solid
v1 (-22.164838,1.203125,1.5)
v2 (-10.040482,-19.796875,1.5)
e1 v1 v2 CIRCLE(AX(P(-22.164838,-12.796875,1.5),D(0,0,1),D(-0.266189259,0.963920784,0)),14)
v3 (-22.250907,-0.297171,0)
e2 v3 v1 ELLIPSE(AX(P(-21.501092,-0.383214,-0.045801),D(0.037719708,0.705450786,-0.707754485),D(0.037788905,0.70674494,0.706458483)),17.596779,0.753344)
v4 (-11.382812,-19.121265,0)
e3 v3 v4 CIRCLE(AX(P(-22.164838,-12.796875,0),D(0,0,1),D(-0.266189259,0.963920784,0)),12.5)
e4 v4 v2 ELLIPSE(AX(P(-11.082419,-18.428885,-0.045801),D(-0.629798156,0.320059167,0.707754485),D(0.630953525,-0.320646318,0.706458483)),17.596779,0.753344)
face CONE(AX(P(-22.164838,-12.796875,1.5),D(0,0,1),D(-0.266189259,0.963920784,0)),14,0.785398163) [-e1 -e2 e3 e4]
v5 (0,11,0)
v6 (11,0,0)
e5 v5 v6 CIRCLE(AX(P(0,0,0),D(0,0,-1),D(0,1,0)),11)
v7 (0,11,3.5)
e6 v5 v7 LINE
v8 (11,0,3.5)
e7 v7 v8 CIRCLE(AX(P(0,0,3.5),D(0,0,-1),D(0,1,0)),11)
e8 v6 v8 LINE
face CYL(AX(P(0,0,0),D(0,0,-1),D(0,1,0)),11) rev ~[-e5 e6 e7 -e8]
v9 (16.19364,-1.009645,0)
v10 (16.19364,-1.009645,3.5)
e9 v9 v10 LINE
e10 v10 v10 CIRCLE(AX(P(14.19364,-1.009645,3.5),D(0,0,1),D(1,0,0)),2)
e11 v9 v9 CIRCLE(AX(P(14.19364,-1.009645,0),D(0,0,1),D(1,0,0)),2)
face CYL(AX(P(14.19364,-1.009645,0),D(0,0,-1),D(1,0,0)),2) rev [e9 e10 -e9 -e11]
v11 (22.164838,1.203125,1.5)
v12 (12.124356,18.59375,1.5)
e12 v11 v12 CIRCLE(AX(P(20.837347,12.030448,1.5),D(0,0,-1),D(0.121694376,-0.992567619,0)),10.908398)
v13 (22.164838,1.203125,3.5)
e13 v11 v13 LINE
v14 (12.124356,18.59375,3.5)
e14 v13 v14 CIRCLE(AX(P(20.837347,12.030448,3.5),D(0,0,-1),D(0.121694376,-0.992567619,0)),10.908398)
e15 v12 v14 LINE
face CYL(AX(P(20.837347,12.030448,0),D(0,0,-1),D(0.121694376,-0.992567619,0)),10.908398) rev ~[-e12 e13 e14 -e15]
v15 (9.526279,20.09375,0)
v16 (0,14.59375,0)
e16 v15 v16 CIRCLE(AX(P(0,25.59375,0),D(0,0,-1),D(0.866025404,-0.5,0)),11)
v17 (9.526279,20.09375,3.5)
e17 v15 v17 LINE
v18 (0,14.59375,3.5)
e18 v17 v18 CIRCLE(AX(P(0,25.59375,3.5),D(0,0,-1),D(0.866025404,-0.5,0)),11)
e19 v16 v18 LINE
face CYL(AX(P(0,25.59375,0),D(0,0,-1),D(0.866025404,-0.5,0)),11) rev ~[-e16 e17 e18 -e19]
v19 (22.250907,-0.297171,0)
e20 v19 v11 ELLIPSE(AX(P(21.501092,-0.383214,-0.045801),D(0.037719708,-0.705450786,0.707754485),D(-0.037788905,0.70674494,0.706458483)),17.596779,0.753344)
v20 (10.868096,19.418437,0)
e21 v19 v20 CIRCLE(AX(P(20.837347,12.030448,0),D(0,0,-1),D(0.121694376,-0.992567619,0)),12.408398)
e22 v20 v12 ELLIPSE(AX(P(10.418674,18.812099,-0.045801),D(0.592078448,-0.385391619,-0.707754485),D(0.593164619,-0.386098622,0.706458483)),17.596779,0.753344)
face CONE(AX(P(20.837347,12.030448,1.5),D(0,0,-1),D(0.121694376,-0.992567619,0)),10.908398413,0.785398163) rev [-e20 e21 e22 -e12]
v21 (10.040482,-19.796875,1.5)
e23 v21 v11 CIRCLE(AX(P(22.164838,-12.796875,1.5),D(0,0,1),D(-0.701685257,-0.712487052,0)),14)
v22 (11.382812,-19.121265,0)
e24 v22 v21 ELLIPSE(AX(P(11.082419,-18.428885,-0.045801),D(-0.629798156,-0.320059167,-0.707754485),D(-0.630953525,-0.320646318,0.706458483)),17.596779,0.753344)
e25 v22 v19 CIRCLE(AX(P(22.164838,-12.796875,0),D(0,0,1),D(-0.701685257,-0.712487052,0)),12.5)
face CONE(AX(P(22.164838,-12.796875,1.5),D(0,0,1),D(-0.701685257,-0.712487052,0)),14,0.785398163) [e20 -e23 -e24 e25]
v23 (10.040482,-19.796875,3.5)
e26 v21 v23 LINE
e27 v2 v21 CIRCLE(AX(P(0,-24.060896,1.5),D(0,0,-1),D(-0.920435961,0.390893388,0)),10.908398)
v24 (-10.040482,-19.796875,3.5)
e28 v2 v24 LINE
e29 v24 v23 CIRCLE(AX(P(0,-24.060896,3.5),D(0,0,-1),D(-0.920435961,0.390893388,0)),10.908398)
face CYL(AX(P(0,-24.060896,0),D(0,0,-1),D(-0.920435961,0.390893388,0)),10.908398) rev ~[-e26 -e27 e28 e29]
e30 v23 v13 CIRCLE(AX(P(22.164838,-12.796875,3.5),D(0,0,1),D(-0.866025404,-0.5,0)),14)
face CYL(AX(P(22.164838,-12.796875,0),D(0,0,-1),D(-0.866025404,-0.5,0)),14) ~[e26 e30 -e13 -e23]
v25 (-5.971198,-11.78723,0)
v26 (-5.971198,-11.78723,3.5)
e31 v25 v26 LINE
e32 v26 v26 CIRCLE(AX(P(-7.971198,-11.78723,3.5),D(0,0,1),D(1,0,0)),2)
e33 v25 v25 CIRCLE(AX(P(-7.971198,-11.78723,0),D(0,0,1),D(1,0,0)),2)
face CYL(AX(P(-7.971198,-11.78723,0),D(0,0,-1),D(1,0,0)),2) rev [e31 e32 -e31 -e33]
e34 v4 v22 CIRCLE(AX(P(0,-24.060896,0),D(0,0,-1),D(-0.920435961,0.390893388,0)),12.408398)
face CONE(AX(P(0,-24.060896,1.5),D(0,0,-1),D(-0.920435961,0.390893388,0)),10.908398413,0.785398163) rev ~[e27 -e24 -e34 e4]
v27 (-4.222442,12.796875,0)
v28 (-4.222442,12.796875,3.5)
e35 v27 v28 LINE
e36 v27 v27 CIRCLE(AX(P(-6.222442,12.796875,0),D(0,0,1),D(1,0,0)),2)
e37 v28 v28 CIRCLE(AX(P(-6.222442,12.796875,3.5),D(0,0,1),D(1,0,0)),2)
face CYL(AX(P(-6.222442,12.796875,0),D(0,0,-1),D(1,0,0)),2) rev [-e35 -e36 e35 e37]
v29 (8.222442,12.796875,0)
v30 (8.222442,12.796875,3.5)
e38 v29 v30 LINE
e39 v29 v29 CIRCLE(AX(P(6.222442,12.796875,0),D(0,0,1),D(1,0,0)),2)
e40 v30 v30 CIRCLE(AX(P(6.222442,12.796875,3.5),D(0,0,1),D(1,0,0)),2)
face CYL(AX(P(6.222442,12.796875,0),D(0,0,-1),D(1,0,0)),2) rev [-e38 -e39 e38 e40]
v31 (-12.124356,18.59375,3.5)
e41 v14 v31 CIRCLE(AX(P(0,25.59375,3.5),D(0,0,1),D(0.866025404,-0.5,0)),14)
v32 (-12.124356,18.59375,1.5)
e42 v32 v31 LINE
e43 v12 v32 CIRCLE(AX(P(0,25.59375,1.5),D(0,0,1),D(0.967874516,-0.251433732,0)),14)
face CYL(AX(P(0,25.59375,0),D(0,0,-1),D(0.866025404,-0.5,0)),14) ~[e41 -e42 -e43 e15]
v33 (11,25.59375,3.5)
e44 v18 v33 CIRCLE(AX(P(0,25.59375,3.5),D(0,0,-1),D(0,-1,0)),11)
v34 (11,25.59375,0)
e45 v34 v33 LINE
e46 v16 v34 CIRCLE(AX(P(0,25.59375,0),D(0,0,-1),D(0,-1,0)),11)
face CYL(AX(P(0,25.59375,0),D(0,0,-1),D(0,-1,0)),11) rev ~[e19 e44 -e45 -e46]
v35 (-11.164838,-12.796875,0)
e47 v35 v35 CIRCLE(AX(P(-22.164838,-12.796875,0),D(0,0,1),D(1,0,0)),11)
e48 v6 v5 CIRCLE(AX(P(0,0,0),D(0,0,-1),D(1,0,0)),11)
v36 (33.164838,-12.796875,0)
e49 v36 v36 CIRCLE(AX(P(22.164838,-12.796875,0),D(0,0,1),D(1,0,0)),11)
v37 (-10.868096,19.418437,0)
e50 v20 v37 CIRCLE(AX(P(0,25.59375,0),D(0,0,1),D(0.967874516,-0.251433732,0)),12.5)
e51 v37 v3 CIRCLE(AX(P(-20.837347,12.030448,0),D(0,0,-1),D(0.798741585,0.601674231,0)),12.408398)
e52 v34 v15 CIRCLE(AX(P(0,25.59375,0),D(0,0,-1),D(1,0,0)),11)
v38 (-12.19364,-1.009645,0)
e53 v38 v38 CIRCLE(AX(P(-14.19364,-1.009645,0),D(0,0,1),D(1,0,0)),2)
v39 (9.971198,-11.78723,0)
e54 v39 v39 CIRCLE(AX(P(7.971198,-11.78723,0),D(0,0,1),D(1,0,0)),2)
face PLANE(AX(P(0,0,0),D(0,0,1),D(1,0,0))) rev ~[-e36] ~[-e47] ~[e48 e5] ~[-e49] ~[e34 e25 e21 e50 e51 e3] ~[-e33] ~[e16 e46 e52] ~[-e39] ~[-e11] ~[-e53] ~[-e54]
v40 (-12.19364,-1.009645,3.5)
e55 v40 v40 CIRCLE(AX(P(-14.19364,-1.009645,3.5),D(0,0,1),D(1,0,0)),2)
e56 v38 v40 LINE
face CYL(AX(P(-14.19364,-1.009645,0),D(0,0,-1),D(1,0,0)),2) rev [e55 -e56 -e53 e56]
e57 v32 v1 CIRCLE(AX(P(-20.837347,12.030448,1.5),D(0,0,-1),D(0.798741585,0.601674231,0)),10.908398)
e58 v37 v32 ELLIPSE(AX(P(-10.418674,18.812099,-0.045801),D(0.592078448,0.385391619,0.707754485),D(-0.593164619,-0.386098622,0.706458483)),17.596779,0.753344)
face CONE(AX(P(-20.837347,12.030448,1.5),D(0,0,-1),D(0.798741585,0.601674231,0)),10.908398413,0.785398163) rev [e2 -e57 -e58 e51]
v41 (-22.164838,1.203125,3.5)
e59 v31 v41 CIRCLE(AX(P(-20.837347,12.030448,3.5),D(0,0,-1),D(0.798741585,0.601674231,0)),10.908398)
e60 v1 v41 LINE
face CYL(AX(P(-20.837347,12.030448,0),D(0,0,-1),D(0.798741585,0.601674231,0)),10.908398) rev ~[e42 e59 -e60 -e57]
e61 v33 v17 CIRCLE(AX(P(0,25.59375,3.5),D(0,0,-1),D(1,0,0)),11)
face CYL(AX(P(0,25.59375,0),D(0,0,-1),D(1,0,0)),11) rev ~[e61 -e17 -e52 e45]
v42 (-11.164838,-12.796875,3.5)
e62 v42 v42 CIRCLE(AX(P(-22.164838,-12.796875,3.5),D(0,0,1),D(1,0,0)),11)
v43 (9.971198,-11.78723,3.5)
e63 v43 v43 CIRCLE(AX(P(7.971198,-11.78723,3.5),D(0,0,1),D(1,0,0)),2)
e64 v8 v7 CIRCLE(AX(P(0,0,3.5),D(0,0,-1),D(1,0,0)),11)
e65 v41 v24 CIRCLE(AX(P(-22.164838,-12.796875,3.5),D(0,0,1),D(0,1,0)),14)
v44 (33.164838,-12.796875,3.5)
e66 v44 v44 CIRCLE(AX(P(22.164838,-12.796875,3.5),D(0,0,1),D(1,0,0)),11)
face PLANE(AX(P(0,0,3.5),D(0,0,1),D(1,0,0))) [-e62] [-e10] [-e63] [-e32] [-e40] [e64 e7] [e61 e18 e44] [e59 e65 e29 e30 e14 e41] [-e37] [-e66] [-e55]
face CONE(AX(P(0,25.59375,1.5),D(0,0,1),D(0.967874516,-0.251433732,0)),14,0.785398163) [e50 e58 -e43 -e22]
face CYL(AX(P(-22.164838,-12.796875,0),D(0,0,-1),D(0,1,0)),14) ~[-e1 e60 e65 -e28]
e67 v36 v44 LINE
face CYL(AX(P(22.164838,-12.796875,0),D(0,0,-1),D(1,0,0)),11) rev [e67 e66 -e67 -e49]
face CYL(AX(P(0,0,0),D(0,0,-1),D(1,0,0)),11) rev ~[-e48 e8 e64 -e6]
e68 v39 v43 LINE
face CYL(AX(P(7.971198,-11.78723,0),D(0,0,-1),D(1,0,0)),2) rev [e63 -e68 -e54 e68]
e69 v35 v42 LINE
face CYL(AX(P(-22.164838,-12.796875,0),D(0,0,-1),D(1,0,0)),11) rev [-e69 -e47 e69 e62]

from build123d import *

# Parameters (mm, degrees)
F0_R       = 11
F0_R_2     = 2
F1_DEPTH   = 3.5
F2_C1_SIZE = 1.5
F2_C2_SIZE = 1.5
F2_C3_SIZE = 1.5
F2_C4_SIZE = 1.5
F2_C5_SIZE = 1.5
F2_C6_SIZE = 1.5


with BuildPart() as f1:
    # F0 (on Top) → F1 (new body)
    with BuildSketch(Plane.XY):
        with BuildLine():
            ThreePointArc((22.164837833, 1.2031249106), (11.390396953, 6.576248747), (12.124355653, 18.5937501788))
            ThreePointArc((12.124355653, 18.5937501788), (0, 39.5937501788), (-12.124355653, 18.5937501788))
            ThreePointArc((-12.124355653, 18.5937501788), (-11.390396953, 6.576248747), (-22.164837833, 1.2031249106))
            ThreePointArc((-22.164837833, 1.2031249106), (-34.2891934859, -19.7968750894), (-10.04048218, -19.7968750894))
            ThreePointArc((-10.04048218, -19.7968750894), (0, -13.152497494), (10.04048218, -19.7968750894))
            ThreePointArc((10.04048218, -19.7968750894), (34.2891934859, -19.7968750894), (22.164837833, 1.2031249106))
        make_face()
        with Locations((-22.164837833, -12.7968750894)):
            Circle(F0_R, mode=Mode.SUBTRACT)
        with Locations((-7.9711980778, -11.7872301109)):
            Circle(F0_R_2, mode=Mode.SUBTRACT)
        with Locations((-14.1936397552, -1.0096449785)):
            Circle(F0_R_2, mode=Mode.SUBTRACT)
        with Locations((7.9711980778, -11.7872301109)):
            Circle(F0_R_2, mode=Mode.SUBTRACT)
        with Locations((22.164837833, -12.7968750894)):
            Circle(F0_R, mode=Mode.SUBTRACT)
        with BuildLine():
            ThreePointArc((0, 11), (7.7781745931, 7.7781745931), (11, 0))
            ThreePointArc((11, 0), (-7.7781745931, -7.7781745931), (0, 11))
        make_face(mode=Mode.SUBTRACT)
        with Locations((14.1936397552, -1.0096449785)):
            Circle(F0_R_2, mode=Mode.SUBTRACT)
        with Locations((-6.2224416774, 12.7968750894)):
            Circle(F0_R_2, mode=Mode.SUBTRACT)
        with Locations((6.2224416774, 12.7968750894)):
            Circle(F0_R_2, mode=Mode.SUBTRACT)
        with BuildLine():
            ThreePointArc((9.5262794416, 20.0937501788), (5.5, 16.0674707372), (0, 14.5937501788))
            ThreePointArc((0, 14.5937501788), (-5.5, 16.0674707372), (-9.5262794416, 20.0937501788))
            ThreePointArc((-9.5262794416, 20.0937501788), (-2.8470094961, 36.218934268), (11, 25.5937501788))
            ThreePointArc((11, 25.5937501788), (10.6251840892, 22.7467406827), (9.5262794416, 20.0937501788))
        make_face(mode=Mode.SUBTRACT)
    extrude(amount=F1_DEPTH)

    # F2: chamfer of 1.5 on 6 edges, made by hand

    # F2_c1
    f2_c1_edges = [f1.edges().sort_by_distance(p)[0] for p in [
        (0, -13.152497494, 0),
    ]]
    chamfer(f2_c1_edges, length=F2_C1_SIZE)

    # F2_c2
    f2_c2_edges = [f1.edges().sort_by_distance(p)[0] for p in [
        (-11.390396953, 6.576248747, 0),
    ]]
    chamfer(f2_c2_edges, length=F2_C2_SIZE)

    # F2_c3
    f2_c3_edges = [f1.edges().sort_by_distance(p)[0] for p in [
        (11.390396953, 6.576248747, 0),
    ]]
    chamfer(f2_c3_edges, length=F2_C3_SIZE)

    # F2_c4
    f2_c4_edges = [f1.edges().sort_by_distance(p)[0] for p in [
        (34.2891934859, -19.7968750894, 0),
    ]]
    chamfer(f2_c4_edges, length=F2_C4_SIZE)

    # F2_c5
    f2_c5_edges = [f1.edges().sort_by_distance(p)[0] for p in [
        (-34.2891934859, -19.7968750894, 0),
    ]]
    chamfer(f2_c5_edges, length=F2_C5_SIZE)

    # F2_c6
    f2_c6_edges = [f1.edges().sort_by_distance(p)[0] for p in [
        (0, 39.5937501788, 0),
    ]]
    chamfer(f2_c6_edges, length=F2_C6_SIZE)


solid = f1.part
